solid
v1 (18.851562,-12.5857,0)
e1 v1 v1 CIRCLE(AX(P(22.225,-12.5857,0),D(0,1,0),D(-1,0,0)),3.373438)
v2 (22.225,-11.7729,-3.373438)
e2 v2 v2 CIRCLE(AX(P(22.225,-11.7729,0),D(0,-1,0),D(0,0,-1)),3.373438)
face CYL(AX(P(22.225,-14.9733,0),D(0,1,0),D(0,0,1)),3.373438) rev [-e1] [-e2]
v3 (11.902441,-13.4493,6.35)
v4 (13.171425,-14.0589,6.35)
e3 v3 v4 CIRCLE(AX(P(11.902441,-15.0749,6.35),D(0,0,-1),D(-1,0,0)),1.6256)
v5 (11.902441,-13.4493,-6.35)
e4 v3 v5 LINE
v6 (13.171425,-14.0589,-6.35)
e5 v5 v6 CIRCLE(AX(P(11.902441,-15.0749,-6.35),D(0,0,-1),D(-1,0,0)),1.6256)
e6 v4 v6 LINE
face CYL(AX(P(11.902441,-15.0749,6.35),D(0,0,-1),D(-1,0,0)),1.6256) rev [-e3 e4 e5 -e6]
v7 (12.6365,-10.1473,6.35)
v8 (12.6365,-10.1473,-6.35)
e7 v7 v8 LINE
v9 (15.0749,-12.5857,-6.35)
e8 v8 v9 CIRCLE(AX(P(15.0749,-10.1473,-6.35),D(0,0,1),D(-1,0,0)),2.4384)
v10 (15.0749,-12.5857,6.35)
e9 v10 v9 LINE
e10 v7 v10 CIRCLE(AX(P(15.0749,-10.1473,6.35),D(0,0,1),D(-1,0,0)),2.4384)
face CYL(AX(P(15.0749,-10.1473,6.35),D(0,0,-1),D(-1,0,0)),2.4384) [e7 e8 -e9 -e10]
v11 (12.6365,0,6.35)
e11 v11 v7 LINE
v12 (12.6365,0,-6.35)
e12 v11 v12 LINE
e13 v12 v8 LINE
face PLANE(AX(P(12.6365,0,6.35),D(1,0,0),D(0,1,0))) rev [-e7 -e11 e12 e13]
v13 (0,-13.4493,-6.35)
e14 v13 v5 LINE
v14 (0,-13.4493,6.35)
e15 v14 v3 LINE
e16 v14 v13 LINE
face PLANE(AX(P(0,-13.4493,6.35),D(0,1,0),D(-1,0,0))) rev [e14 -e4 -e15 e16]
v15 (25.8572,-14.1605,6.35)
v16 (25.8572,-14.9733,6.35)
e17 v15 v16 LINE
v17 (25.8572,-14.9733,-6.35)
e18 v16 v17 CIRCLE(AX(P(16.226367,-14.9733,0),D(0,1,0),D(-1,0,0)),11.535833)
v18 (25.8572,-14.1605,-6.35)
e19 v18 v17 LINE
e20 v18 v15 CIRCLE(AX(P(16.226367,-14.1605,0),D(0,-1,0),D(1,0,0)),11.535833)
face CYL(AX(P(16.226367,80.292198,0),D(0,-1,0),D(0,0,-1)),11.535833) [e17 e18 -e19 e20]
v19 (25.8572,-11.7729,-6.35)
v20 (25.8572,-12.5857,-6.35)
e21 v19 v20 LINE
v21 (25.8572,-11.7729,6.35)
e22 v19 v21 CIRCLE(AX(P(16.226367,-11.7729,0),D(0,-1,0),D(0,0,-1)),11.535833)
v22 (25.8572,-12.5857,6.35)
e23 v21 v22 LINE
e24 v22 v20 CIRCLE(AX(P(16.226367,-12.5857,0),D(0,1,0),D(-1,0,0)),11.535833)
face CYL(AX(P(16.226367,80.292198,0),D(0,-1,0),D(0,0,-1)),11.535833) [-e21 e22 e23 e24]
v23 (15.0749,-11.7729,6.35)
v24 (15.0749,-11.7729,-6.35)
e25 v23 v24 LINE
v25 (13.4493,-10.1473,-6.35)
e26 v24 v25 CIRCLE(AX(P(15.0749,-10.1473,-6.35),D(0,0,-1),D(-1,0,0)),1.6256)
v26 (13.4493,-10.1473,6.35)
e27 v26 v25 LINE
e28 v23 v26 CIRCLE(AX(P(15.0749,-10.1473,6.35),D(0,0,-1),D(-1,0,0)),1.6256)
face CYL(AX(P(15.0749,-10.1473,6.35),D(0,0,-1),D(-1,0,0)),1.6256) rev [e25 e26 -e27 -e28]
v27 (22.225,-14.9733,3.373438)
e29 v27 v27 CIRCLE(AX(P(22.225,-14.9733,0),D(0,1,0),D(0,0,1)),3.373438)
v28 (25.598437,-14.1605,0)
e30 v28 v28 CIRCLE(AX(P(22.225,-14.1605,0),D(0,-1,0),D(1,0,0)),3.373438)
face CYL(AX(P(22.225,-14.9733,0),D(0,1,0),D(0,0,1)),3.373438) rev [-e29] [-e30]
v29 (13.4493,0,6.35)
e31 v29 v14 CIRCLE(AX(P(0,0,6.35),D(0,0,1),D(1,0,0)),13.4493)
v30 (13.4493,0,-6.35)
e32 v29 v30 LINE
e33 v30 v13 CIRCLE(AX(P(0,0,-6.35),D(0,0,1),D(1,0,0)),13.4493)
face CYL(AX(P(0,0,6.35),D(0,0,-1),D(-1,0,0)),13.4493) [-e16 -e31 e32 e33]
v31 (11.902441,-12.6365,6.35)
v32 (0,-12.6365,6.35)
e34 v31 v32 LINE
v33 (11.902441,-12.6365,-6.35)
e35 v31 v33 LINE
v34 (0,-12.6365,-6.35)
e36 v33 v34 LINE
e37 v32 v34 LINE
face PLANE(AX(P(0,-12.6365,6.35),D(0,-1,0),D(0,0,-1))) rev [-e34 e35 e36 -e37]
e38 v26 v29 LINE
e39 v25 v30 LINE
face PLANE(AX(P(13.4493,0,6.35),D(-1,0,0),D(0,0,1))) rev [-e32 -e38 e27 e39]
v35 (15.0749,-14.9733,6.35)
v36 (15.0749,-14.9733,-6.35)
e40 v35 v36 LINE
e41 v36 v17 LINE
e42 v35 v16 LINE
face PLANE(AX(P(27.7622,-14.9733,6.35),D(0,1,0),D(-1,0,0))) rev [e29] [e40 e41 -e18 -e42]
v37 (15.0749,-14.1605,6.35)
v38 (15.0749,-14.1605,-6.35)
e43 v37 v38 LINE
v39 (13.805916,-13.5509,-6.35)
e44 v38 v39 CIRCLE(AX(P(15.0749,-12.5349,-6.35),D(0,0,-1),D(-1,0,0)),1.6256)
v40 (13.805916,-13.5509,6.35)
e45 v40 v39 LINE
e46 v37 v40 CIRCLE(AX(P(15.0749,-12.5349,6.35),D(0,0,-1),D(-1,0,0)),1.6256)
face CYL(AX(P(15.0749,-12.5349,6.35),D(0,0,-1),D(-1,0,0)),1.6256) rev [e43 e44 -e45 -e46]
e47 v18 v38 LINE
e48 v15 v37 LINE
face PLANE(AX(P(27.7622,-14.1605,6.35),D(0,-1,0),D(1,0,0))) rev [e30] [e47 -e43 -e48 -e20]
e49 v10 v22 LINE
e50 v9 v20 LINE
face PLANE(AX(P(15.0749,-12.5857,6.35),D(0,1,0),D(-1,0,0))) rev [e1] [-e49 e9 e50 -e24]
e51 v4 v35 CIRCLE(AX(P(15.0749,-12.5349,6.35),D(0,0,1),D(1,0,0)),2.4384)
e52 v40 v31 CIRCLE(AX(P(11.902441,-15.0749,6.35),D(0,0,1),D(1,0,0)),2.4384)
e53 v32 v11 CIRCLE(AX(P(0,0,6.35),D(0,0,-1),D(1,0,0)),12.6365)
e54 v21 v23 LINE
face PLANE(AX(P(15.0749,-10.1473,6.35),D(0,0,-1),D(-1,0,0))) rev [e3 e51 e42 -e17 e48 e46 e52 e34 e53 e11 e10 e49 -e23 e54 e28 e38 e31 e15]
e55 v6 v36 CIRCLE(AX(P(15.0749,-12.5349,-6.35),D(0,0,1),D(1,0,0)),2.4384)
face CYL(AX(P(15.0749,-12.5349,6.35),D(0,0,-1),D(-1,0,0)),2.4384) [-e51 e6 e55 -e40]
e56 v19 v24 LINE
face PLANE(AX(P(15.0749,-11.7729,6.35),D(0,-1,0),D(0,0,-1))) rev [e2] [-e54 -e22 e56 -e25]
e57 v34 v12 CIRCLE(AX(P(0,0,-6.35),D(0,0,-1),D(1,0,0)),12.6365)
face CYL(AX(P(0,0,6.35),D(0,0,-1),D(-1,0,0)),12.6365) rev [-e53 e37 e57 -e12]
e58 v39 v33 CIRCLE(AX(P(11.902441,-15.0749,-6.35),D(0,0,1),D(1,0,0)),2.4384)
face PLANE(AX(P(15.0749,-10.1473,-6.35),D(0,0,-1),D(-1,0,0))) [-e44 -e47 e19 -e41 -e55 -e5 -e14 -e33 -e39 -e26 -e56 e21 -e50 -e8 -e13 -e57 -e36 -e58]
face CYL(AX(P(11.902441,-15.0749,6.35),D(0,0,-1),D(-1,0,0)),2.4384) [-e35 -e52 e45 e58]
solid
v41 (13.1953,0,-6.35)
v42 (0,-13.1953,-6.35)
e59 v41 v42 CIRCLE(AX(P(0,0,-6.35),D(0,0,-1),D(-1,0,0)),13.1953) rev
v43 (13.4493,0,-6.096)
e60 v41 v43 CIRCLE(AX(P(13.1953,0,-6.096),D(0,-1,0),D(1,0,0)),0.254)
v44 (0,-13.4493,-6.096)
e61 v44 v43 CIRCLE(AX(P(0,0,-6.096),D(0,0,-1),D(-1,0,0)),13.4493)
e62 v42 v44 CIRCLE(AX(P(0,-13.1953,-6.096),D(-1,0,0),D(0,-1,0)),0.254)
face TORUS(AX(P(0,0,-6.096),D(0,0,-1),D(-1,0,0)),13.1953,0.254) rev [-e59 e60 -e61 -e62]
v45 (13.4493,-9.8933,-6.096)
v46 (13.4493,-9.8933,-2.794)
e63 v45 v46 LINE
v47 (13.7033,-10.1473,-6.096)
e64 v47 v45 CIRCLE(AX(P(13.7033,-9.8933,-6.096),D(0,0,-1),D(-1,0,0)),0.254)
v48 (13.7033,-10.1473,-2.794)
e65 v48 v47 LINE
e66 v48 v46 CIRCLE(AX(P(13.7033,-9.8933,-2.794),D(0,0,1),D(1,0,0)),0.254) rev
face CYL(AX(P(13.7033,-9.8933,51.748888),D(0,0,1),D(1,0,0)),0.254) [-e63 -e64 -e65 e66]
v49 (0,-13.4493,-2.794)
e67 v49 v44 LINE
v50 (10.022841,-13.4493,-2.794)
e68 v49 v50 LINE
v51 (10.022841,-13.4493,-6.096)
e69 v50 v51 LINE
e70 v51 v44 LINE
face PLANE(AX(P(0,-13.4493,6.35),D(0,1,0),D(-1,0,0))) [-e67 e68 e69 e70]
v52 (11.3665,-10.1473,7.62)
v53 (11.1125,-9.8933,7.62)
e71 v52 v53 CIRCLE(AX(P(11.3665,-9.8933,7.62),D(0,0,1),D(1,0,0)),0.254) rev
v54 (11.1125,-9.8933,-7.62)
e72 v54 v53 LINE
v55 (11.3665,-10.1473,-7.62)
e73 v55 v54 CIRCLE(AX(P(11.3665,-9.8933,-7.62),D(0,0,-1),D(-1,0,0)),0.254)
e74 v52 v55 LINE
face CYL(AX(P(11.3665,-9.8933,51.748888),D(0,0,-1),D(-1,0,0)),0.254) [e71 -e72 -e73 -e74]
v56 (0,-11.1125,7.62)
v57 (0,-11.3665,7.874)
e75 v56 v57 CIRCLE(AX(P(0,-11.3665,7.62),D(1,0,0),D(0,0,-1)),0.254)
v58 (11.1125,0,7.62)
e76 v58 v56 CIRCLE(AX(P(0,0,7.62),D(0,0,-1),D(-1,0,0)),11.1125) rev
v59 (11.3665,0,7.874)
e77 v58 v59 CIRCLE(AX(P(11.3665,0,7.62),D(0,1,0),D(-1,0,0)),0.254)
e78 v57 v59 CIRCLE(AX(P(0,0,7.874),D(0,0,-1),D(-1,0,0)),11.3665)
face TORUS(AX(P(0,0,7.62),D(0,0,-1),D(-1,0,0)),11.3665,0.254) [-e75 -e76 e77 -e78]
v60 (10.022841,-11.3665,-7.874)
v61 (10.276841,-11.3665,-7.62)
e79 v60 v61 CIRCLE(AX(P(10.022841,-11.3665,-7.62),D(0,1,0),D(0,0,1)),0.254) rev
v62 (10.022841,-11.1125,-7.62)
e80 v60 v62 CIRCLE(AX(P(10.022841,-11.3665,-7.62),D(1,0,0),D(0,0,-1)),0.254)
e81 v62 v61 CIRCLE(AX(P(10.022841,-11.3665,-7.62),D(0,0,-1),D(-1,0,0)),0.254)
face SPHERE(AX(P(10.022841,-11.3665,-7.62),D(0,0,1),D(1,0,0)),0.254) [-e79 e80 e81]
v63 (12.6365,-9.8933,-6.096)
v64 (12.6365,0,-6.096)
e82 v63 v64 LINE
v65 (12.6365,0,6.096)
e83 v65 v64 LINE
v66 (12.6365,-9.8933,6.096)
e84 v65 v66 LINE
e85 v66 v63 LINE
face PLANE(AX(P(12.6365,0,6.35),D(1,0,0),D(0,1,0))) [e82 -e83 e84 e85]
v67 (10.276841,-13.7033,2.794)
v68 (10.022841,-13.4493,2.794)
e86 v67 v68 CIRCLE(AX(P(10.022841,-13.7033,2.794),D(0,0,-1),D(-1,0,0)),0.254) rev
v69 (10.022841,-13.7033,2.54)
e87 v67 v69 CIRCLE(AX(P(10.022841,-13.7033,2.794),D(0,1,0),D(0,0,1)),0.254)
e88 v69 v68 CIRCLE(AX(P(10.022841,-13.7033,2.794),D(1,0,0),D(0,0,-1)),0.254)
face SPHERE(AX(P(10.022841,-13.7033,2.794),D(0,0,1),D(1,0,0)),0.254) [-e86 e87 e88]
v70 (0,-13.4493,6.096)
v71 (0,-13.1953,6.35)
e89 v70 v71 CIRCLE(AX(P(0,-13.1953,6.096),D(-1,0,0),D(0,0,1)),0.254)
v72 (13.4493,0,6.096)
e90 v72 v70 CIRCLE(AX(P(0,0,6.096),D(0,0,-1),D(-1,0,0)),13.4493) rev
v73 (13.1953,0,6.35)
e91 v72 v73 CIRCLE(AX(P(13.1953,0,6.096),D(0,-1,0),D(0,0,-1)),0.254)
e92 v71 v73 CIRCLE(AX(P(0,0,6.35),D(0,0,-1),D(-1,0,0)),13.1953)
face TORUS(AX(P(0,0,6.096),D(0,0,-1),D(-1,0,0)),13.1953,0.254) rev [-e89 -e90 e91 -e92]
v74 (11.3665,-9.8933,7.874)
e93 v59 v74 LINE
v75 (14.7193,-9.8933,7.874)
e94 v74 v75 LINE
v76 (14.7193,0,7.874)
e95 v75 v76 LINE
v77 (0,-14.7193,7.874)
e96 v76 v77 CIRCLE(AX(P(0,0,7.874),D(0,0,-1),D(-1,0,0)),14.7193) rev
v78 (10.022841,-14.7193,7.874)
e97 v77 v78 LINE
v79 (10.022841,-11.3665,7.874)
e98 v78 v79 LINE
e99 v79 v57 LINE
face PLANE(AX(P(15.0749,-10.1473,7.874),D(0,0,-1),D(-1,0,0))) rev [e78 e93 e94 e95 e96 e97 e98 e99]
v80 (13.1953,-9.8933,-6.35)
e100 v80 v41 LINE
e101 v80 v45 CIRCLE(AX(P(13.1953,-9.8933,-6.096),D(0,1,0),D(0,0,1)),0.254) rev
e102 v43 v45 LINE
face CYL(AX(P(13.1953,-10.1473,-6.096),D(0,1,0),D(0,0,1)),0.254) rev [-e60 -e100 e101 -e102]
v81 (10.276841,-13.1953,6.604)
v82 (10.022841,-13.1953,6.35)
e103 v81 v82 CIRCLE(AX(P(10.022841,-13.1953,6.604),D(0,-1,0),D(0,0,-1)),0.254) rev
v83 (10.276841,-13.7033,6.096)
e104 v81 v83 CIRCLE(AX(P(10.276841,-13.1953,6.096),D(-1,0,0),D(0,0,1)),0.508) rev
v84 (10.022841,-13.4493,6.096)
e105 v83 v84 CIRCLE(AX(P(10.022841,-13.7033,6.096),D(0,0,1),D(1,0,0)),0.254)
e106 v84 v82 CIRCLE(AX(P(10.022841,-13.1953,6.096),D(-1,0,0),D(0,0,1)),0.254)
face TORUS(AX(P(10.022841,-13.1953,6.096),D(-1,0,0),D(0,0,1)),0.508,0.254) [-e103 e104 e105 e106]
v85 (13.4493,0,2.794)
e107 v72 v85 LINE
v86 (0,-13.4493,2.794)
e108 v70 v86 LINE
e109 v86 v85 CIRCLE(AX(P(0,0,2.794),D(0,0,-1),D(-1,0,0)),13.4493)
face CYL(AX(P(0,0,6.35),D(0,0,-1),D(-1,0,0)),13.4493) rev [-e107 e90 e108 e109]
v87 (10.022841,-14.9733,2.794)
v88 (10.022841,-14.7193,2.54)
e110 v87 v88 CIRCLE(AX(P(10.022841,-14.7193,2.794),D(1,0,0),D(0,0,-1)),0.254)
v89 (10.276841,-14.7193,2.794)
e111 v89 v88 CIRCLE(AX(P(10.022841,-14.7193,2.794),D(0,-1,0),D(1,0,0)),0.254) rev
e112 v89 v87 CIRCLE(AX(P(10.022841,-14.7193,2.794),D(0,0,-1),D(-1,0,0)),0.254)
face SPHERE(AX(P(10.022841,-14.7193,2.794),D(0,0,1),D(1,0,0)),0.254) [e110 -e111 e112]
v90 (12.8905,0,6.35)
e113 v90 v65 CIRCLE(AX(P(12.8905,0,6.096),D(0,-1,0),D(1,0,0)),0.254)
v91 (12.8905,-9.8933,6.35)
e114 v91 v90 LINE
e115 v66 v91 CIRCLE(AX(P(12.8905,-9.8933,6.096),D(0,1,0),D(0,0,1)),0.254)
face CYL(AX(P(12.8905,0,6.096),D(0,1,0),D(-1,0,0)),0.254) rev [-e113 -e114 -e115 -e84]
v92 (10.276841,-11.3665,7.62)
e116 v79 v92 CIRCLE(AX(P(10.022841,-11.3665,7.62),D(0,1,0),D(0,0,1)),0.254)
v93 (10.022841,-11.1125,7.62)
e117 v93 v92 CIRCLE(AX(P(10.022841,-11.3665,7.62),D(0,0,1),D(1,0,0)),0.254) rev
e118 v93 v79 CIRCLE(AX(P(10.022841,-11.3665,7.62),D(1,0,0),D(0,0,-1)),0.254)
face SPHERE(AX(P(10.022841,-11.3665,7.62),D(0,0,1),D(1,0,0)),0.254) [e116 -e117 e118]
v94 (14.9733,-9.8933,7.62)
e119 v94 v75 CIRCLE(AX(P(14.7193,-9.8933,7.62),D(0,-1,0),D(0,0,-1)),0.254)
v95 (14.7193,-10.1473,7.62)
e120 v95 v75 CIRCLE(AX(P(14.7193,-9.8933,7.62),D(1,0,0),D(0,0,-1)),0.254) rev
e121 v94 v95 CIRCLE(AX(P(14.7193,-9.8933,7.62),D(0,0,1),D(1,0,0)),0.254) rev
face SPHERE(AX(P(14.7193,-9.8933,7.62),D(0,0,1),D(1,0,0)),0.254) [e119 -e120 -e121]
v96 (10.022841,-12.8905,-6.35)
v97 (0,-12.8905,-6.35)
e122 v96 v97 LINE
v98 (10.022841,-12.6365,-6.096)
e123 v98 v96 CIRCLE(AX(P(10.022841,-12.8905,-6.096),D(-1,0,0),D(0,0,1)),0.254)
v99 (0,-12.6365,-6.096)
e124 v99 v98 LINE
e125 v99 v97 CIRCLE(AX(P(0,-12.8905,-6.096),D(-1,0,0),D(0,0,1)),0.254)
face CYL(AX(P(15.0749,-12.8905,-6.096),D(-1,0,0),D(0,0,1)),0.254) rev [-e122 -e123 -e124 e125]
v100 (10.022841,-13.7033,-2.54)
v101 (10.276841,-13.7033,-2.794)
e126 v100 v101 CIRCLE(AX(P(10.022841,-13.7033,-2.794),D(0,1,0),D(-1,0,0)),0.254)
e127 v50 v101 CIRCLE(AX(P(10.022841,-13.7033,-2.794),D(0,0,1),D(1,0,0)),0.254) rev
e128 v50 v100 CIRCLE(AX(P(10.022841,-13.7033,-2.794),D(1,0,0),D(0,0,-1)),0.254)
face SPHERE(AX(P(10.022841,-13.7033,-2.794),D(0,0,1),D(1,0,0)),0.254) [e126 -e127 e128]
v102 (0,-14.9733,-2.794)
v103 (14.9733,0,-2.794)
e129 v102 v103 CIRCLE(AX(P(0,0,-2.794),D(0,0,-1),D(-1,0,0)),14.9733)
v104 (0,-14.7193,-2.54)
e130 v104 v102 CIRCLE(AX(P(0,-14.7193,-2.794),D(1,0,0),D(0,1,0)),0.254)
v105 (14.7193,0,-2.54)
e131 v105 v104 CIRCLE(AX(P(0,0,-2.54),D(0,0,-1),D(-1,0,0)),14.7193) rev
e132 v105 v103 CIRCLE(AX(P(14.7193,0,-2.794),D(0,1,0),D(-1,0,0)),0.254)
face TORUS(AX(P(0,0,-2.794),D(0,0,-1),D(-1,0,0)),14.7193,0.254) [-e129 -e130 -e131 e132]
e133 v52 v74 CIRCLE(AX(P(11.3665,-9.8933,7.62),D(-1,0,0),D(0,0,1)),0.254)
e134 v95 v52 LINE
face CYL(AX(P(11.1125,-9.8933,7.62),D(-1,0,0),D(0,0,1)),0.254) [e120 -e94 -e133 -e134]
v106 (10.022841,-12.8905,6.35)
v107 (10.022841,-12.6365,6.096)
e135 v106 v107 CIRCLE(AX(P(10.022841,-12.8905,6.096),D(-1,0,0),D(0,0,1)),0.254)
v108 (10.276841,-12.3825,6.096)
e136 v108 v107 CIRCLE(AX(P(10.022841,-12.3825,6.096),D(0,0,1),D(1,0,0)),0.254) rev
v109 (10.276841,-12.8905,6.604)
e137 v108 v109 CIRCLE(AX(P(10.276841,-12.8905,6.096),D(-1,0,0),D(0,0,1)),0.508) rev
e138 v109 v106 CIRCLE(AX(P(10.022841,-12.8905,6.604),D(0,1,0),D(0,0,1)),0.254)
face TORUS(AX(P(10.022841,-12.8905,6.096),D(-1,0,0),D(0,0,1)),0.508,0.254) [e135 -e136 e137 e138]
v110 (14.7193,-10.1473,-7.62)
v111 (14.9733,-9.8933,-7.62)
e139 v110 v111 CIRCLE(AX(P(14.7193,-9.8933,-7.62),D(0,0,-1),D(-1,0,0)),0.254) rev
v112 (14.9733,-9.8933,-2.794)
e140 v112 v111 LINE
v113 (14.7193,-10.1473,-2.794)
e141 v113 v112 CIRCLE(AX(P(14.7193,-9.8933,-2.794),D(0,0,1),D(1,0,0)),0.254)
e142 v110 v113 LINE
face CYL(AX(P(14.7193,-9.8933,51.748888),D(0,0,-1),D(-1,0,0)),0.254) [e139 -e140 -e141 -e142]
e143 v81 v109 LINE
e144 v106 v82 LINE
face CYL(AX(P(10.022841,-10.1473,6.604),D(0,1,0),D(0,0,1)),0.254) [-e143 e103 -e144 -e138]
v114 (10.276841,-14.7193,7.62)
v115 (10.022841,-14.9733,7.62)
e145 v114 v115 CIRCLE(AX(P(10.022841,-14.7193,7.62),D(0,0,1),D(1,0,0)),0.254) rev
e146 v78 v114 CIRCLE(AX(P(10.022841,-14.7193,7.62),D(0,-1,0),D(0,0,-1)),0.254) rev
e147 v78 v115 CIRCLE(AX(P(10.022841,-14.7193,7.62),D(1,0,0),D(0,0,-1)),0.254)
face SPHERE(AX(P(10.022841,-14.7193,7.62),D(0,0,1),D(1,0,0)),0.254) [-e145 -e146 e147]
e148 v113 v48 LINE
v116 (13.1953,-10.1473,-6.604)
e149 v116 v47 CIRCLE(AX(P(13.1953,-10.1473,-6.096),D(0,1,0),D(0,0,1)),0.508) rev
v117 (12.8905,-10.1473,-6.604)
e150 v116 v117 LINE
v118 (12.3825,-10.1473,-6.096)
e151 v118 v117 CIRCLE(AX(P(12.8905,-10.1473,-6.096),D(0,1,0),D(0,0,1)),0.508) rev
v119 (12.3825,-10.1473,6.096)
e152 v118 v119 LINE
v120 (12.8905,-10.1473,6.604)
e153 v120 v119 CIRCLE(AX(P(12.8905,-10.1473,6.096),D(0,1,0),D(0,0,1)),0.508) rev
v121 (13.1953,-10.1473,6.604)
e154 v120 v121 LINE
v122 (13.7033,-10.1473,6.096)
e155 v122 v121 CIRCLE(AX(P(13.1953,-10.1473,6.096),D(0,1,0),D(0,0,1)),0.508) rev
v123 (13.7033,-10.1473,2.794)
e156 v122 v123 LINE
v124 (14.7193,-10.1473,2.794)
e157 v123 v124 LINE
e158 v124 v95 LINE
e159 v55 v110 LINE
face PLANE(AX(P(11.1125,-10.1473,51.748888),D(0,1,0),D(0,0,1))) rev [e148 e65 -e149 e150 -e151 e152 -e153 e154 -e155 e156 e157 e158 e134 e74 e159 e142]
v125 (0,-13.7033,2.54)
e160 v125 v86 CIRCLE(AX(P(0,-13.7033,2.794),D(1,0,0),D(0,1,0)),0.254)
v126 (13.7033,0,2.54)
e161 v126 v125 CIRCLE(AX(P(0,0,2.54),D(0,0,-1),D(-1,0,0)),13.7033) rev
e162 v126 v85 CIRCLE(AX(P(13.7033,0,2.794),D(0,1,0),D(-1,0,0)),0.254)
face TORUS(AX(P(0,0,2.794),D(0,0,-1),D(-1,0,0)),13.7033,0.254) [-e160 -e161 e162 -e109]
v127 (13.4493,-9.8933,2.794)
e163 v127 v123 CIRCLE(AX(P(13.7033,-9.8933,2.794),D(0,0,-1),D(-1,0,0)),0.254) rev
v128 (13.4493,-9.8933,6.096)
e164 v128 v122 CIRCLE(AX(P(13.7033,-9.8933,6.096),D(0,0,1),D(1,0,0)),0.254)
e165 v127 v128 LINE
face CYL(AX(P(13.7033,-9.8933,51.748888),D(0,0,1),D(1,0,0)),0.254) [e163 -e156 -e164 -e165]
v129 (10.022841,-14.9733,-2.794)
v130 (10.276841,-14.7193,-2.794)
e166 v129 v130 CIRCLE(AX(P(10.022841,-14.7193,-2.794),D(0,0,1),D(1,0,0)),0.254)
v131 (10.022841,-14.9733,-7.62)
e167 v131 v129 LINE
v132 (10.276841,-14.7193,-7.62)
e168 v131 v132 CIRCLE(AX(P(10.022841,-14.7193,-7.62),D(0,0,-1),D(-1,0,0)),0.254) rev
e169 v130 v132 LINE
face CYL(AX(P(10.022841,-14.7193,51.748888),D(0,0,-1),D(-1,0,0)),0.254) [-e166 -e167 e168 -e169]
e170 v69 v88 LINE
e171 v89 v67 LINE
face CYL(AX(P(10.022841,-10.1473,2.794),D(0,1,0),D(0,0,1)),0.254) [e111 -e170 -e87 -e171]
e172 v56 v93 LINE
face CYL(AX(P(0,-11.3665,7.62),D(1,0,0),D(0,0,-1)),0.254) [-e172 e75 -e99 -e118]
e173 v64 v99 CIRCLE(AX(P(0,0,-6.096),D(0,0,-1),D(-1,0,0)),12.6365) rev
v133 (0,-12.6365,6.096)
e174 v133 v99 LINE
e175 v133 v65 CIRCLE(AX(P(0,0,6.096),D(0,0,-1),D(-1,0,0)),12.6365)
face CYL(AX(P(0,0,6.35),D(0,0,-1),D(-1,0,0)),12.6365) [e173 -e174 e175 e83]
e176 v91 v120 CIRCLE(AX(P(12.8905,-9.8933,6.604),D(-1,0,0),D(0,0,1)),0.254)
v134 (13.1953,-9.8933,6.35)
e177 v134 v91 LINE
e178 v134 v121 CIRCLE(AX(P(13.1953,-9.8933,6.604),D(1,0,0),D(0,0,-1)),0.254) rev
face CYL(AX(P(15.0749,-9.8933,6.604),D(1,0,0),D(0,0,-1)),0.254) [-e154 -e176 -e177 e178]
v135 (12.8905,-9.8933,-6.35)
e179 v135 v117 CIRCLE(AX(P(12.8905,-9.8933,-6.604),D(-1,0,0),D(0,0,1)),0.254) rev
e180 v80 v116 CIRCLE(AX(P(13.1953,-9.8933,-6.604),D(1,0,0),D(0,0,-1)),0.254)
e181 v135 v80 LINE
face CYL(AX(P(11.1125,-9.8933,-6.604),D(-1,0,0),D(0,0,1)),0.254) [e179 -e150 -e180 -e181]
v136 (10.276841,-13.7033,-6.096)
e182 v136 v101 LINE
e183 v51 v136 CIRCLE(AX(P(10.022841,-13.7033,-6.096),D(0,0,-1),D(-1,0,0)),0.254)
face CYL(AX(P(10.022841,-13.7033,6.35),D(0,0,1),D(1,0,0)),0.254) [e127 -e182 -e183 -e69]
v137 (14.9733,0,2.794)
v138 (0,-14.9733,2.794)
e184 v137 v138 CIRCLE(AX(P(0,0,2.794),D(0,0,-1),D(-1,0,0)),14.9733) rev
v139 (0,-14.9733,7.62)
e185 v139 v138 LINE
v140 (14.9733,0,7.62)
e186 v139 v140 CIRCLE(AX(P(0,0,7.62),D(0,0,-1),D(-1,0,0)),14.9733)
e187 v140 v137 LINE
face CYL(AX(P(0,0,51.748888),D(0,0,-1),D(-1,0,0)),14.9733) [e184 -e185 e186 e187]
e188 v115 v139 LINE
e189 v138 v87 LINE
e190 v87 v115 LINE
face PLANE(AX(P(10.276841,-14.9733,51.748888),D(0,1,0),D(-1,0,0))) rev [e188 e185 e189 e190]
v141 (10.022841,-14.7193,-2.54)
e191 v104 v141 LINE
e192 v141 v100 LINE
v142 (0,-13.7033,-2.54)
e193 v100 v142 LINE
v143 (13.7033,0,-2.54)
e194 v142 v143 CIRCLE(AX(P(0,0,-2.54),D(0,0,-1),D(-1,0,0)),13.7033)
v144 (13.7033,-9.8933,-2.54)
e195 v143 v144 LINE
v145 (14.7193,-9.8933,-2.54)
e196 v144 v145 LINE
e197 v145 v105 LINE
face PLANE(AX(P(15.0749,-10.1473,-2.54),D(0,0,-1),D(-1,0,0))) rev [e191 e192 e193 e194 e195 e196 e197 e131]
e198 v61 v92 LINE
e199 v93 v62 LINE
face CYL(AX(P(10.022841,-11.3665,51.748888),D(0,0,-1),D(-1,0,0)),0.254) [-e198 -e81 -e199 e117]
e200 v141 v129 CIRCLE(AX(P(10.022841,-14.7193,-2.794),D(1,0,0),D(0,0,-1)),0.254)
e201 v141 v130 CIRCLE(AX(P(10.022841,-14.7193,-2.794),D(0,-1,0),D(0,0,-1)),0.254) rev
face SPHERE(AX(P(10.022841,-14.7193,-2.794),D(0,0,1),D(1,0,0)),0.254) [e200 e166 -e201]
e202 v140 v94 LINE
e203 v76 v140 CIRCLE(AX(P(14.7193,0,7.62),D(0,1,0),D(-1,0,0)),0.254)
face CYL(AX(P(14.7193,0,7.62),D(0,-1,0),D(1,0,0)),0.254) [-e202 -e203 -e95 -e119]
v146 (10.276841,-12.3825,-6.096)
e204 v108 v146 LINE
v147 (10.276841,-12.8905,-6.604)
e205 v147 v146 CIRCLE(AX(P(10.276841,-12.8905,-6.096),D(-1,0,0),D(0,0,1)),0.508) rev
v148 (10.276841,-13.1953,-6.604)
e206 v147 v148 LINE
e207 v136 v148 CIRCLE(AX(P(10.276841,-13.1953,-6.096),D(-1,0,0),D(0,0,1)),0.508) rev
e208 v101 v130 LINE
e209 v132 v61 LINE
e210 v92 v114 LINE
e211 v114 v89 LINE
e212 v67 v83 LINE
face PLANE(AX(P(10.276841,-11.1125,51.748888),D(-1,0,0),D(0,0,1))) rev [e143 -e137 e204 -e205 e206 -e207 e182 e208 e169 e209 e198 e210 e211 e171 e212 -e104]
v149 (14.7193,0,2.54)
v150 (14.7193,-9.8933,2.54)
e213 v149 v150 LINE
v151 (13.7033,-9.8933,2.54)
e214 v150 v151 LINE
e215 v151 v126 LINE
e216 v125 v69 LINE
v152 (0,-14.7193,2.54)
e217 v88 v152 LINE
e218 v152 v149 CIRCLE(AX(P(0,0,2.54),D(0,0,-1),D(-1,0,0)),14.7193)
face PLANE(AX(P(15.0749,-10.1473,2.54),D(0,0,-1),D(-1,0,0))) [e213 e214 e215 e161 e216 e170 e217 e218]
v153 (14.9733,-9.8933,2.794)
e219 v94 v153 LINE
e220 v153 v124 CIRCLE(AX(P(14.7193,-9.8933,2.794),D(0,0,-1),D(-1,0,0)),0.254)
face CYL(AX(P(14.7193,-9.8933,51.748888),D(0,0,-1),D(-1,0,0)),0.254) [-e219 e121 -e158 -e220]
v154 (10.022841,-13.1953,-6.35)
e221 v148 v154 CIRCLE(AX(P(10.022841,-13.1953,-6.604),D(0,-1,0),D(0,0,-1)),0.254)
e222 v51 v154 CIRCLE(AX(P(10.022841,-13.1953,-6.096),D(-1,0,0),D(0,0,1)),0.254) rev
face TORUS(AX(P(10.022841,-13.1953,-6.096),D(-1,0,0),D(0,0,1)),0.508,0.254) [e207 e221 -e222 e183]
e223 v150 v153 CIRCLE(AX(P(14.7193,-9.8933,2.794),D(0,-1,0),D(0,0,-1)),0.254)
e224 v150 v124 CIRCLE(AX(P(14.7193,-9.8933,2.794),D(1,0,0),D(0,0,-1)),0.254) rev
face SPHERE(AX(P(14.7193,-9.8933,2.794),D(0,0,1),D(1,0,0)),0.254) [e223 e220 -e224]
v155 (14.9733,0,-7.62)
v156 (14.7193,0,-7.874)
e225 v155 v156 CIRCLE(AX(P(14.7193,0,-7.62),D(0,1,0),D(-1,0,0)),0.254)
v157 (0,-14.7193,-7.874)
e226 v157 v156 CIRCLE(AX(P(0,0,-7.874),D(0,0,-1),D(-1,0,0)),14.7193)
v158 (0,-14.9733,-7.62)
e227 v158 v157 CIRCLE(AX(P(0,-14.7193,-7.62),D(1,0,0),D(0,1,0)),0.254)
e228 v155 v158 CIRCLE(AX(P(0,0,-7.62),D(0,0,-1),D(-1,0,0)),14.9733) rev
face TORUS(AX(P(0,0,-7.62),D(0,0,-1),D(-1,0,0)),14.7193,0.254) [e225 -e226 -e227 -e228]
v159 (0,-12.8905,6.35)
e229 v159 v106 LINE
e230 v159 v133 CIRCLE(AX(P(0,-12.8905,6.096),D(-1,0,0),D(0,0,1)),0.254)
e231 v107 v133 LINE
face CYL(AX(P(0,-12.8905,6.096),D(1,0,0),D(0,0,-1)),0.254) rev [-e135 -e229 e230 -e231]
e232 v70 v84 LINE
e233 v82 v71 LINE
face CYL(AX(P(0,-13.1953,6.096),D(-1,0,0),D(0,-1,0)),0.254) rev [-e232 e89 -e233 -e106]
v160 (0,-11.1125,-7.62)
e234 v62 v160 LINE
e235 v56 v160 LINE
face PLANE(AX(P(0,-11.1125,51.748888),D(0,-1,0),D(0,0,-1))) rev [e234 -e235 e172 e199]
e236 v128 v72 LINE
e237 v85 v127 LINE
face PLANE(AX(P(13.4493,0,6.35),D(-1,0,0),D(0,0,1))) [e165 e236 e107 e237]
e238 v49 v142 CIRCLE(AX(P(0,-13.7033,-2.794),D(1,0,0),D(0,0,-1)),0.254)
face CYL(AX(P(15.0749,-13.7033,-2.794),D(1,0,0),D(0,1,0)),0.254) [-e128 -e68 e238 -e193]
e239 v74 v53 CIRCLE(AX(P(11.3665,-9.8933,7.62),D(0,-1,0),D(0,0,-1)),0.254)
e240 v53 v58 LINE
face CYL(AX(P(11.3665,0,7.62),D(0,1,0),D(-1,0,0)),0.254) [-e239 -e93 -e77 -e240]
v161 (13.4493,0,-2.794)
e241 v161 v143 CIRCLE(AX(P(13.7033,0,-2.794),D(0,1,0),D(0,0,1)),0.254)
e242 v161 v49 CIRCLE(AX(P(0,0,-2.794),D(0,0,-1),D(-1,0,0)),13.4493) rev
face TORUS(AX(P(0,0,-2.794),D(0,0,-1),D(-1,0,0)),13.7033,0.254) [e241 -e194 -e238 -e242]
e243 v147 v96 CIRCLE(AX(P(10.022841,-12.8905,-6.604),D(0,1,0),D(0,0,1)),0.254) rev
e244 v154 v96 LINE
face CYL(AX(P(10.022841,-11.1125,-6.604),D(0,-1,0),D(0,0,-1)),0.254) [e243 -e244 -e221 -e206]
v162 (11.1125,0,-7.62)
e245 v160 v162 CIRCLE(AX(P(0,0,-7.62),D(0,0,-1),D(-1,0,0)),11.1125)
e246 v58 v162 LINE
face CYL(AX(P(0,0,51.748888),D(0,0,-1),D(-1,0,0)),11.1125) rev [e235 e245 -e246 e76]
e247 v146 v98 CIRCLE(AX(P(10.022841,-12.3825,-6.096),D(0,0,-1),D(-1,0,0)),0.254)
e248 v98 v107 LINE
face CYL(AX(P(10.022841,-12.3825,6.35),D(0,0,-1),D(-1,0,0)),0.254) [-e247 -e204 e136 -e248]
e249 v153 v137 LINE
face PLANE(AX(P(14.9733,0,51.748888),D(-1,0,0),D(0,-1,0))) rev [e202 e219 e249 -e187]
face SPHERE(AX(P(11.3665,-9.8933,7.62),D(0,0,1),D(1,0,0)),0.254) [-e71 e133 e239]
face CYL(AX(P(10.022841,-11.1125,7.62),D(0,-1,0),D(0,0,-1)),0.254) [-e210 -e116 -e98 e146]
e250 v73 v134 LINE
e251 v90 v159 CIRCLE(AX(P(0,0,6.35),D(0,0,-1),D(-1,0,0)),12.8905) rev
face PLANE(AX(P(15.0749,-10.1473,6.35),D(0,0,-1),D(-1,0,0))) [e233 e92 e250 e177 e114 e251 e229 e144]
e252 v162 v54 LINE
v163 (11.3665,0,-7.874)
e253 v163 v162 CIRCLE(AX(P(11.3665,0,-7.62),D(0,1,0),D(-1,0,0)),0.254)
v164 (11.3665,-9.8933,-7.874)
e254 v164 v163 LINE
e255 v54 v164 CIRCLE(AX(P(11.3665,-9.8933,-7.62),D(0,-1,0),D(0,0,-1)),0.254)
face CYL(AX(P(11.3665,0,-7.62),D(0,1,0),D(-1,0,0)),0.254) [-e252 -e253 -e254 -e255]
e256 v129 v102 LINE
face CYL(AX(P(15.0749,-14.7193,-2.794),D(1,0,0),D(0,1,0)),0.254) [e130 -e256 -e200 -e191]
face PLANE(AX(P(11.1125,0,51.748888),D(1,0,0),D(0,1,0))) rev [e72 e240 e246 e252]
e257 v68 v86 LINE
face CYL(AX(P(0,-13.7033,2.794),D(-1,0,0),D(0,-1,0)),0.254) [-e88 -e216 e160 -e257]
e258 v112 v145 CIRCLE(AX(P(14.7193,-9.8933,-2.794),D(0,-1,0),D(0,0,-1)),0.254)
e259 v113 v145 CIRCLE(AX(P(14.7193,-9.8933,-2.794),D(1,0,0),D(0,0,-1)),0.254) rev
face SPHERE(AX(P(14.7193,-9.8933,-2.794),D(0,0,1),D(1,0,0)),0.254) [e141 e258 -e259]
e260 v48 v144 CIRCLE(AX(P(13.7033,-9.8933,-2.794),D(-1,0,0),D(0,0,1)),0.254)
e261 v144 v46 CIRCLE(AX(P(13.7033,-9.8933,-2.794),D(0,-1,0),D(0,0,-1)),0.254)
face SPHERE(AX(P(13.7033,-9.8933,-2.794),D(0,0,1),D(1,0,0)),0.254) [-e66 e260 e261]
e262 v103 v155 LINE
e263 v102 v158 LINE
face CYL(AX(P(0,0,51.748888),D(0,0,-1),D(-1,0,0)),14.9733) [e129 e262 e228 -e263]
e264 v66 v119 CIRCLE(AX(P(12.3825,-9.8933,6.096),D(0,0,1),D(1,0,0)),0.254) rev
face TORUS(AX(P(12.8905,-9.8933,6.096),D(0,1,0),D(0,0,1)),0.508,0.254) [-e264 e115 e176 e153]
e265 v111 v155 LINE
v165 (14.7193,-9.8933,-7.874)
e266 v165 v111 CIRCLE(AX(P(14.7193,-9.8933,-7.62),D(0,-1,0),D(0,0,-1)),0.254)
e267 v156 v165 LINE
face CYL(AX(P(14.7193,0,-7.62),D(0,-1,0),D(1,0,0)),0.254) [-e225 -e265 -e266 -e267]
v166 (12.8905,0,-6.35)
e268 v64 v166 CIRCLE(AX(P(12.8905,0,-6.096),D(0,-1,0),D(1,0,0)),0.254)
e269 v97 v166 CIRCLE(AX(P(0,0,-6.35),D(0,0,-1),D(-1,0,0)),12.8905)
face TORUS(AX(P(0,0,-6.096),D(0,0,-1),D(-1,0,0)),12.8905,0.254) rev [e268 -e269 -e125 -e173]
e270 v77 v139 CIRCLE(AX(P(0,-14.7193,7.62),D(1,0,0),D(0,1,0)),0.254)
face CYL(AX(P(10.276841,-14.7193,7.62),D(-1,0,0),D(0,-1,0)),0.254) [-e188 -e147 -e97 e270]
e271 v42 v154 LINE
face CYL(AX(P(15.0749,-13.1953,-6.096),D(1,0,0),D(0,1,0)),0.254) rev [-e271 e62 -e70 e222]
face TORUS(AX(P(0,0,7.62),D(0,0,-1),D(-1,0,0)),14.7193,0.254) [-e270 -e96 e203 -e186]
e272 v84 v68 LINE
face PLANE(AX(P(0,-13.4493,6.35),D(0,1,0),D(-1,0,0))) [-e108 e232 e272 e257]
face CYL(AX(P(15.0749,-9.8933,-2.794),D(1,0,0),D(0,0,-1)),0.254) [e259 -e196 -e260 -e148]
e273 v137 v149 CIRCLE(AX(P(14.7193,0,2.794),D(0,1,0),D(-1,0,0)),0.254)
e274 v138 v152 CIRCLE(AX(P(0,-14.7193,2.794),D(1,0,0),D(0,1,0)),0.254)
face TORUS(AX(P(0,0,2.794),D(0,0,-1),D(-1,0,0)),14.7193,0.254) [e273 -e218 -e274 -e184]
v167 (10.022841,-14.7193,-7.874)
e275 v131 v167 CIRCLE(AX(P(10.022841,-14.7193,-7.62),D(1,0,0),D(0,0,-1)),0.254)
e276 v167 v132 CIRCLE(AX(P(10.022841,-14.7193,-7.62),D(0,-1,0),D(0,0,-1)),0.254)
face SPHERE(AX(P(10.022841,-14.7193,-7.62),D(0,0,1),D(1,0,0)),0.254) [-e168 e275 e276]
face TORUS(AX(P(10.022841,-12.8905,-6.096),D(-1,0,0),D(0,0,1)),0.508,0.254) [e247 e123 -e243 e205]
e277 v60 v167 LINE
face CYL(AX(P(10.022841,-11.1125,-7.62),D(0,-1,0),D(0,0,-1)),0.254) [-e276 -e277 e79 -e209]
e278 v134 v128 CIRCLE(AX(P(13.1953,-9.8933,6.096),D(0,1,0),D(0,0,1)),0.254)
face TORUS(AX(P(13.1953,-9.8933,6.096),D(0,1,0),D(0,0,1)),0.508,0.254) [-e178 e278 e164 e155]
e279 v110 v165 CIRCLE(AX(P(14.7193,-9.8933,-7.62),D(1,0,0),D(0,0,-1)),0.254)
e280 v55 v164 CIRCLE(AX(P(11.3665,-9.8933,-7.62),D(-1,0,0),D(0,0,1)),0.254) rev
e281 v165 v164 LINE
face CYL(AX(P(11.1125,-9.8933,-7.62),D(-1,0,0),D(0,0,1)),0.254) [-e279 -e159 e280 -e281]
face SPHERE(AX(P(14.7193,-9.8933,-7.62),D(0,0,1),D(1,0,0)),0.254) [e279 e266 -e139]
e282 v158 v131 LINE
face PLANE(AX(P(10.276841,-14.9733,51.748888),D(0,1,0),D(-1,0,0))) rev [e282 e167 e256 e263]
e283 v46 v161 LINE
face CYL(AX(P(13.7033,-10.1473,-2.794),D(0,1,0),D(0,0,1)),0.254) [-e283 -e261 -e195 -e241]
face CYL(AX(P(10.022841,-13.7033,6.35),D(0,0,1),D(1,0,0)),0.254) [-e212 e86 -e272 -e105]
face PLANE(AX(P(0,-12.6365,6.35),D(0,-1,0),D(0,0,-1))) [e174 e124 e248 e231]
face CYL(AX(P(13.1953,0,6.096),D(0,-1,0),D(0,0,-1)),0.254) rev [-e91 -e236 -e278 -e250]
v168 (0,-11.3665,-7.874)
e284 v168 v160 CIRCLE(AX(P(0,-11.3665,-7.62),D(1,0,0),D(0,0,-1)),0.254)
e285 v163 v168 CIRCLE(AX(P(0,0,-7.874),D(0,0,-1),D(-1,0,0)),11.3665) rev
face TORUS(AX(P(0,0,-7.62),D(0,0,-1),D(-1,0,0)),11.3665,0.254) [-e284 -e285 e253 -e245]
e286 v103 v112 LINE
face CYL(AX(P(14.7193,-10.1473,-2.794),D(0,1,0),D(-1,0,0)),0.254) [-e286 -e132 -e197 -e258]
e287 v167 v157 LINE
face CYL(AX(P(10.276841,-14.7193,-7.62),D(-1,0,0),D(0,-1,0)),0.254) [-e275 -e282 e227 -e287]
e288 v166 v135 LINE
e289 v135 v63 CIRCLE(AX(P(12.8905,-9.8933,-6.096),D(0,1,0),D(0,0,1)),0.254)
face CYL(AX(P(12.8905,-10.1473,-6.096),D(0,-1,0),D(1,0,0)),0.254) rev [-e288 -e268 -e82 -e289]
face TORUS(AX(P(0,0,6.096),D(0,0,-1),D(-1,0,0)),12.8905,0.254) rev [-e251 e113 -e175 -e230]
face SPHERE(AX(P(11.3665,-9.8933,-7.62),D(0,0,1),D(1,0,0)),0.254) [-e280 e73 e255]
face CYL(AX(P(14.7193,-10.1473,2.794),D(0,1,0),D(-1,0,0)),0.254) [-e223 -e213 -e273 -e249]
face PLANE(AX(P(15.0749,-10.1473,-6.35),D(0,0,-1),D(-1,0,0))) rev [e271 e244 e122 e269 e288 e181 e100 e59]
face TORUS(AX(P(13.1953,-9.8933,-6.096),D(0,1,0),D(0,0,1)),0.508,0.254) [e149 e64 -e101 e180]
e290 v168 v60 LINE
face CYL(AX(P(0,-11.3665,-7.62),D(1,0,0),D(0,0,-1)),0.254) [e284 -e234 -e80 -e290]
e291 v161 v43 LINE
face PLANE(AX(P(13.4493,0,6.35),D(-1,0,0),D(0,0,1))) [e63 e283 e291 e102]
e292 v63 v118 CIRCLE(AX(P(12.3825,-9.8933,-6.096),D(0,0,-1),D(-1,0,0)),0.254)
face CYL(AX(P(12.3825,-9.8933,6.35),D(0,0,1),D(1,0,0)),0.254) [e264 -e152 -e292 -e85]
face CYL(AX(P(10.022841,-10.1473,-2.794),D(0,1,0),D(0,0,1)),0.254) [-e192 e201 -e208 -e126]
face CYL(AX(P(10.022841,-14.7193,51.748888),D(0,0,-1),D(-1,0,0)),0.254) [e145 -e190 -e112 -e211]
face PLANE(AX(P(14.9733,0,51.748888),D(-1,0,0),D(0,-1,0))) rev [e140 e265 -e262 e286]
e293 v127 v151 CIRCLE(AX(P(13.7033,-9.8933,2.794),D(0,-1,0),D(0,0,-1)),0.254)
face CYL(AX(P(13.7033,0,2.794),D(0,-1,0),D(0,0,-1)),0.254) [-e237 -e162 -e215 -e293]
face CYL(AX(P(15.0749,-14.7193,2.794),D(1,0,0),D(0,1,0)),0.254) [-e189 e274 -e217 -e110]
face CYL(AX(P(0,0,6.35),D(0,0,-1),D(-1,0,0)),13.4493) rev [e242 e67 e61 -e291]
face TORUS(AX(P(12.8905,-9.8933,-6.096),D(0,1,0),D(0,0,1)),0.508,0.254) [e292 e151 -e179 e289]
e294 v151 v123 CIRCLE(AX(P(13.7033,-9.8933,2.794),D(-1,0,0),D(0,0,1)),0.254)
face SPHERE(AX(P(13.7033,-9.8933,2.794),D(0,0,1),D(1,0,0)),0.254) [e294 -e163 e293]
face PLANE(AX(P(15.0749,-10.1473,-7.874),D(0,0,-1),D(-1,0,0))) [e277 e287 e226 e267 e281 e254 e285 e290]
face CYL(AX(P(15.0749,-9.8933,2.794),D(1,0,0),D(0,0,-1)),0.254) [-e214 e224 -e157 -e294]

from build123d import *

# Parameters (mm, degrees)
BOSS_EXTRUDE1_DEPTH         = 6.35
SKETCH2_R                   = 3.3734375
CUT_EXTRUDE1_DEPTH          = 33.17548697
CUT_EXTRUDE3_DEPTH          = 33.17548697
CUT_EXTRUDE3_DEPTH_BACK     = 33.17548697
BOSS_EXTRUDE2_DEPTH         = 7.874
BOSS_EXTRUDE2_DEPTH_BACK    = 7.874
BODY_MOVE_COPY1_START       = -10.1473
BODY_MOVE_COPY1_OUTLINE_W   = 0.8128
BODY_MOVE_COPY1_OUTLINE_H   = 12.7
BODY_MOVE_COPY1_DEPTH       = 10.1473
BODY_MOVE_COPY1_START_2     = -13.5509
BODY_MOVE_COPY1_2_OUTLINE_W = 0.8128
BODY_MOVE_COPY1_2_OUTLINE_H = 12.7
BODY_MOVE_COPY1_2_DEPTH     = 0.1016
BODY_MOVE_COPY1_START_3     = -12.5857
BODY_MOVE_COPY1_3_OUTLINE_R = 3.3734375
BODY_MOVE_COPY1_3_DEPTH     = 2.4384
BODY_MOVE_COPY1_START_4     = -14.9733
BODY_MOVE_COPY1_4_OUTLINE_R = 3.3734375
BODY_MOVE_COPY1_4_DEPTH     = 2.3368
BODY_MOVE_COPY1_5_OUTLINE_W = 0.8128
BODY_MOVE_COPY1_5_OUTLINE_H = 12.7
BODY_MOVE_COPY1_5_DEPTH     = 12.6365
BODY_MOVE_COPY1_START_5     = -6.35
BODY_MOVE_COPY1_6_DEPTH     = 12.7
BODY_MOVE_COPY1_7_DEPTH     = 12.7
CUT_EXTRUDE4_DEPTH          = 2.54
CUT_EXTRUDE4_DEPTH_BACK     = 2.54
FILLET1_R                   = 0.254


with BuildPart() as part:
    # Sketch1 → Boss-Extrude1 (new, symmetric)
    with BuildSketch(Plane.XY):
        with BuildLine():
            Line((0, -12.6365), (11.902441017, -12.6365))
            ThreePointArc((11.902441017, -12.6365), (12.958299189, -12.876955942), (13.805916407, -13.5509))
            ThreePointArc((13.805916407, -13.5509), (14.370994552, -14.000196038), (15.0749, -14.1605))
            Line((15.0749, -14.1605), (27.7622, -14.1605))
            Line((27.7622, -14.1605), (27.7622, -14.9733))
            Line((27.7622, -14.9733), (15.0749, -14.9733))
            ThreePointArc((15.0749, -14.9733), (14.019041828, -14.732844058), (13.17142461, -14.0589))
            ThreePointArc((13.17142461, -14.0589), (12.606346465, -13.609603962), (11.902441017, -13.4493))
            Line((11.902441017, -13.4493), (0, -13.4493))
            ThreePointArc((0, -13.4493), (-9.510091232, 9.510091232), (13.4493, 0))
            Line((13.4493, 0), (13.4493, -10.1473))
            ThreePointArc((13.4493, -10.1473), (13.925427217, -11.296772783), (15.0749, -11.7729))
            Line((15.0749, -11.7729), (27.7622, -11.7729))
            Line((27.7622, -11.7729), (27.7622, -12.5857))
            Line((27.7622, -12.5857), (15.0749, -12.5857))
            ThreePointArc((15.0749, -12.5857), (13.350690825, -11.871509175), (12.6365, -10.1473))
            Line((12.6365, -10.1473), (12.6365, 0))
            ThreePointArc((12.6365, 0), (-8.93535484, 8.93535484), (0, -12.6365))
        make_face()
    extrude(amount=BOSS_EXTRUDE1_DEPTH, both=True)

    # Sketch2 → Cut-Extrude1 (cut, through all)
    with BuildSketch(Plane(origin=(0, 0, 0), x_dir=(1, 0, 0), z_dir=(0, 1, 0))):
        with Locations(Location((22.225, 0, 0), (0, 0, 270))):
            Circle(SKETCH2_R)
    extrude(amount=-CUT_EXTRUDE1_DEPTH, mode=Mode.SUBTRACT)

    # Sketch4 → Cut-Extrude3 (cut, two sides: drawn at the far end of the back side and taken through both)
    with BuildSketch(Plane(origin=(0, 0, 0), x_dir=(1, 0, 0), z_dir=(0, 1, 0)).offset(-CUT_EXTRUDE3_DEPTH_BACK)):
        with BuildLine():
            Line((-25.123285896, 83.67040361), (25.8572, 6.35))
            ThreePointArc((25.8572, 6.35), (27.7622, 0), (25.8572, -6.35))
            Line((25.8572, -6.35), (-25.123285896, -83.67040361))
            Line((-25.123285896, -83.67040361), (160.10581286, -83.67040361))
            Line((160.10581286, -83.67040361), (160.10581286, 83.67040361))
            Line((160.10581286, 83.67040361), (-25.123285896, 83.67040361))
        make_face()
    extrude(amount=CUT_EXTRUDE3_DEPTH + CUT_EXTRUDE3_DEPTH_BACK, mode=Mode.SUBTRACT)


with BuildPart() as body_2:
    # Sketch5 → Boss-Extrude2 (new, two sides: drawn at the far end of the back side and taken through both)
    with BuildSketch(Plane.XY.offset(-BOSS_EXTRUDE2_DEPTH_BACK)):
        with BuildLine():
            Line((11.1125, 0), (11.1125, -10.1473))
            Line((11.1125, -10.1473), (14.9733, -10.1473))
            Line((14.9733, -10.1473), (14.9733, 0))
            ThreePointArc((14.9733, 0), (-10.587721967, 10.587721967), (0, -14.9733))
            Line((0, -14.9733), (10.276841017, -14.9733))
            Line((10.276841017, -14.9733), (10.276841017, -11.1125))
            Line((10.276841017, -11.1125), (0, -11.1125))
            ThreePointArc((0, -11.1125), (-7.857724106, 7.857724106), (11.1125, 0))
        make_face()
    extrude(amount=BOSS_EXTRUDE2_DEPTH + BOSS_EXTRUDE2_DEPTH_BACK)


with BuildPart() as body_3:
    # Body-Move/Copy1: read off the stored shape, not the designer's step
    # Body-Move/Copy1 outline → Body-Move/Copy1 (new body)
    with BuildSketch(Plane(origin=(0, 0, 0), x_dir=(1, 0, 0), z_dir=(0, 1, 0)).offset(BODY_MOVE_COPY1_START)):
        with Locations((13.0429, 0)):
            Rectangle(BODY_MOVE_COPY1_OUTLINE_W, BODY_MOVE_COPY1_OUTLINE_H)
    extrude(amount=BODY_MOVE_COPY1_DEPTH)

    # Body-Move_Copy1 2 outline → Body-Move_Copy1 2 (add)
    with BuildSketch(Plane(origin=(0, 0, 0), x_dir=(1, 0, 0), z_dir=(0, 1, 0)).offset(BODY_MOVE_COPY1_START_2)):
        with Locations((13.0429, 0)):
            Rectangle(BODY_MOVE_COPY1_2_OUTLINE_W, BODY_MOVE_COPY1_2_OUTLINE_H)
    extrude(amount=BODY_MOVE_COPY1_2_DEPTH)

    # Body-Move_Copy1 3 outline → Body-Move_Copy1 3 (add)
    with BuildSketch(Plane(origin=(0, 0, 0), x_dir=(1, 0, 0), z_dir=(0, 1, 0)).offset(BODY_MOVE_COPY1_START_3)):
        with BuildLine():
            ThreePointArc((25.8572, -6.35), (27.7622, 0), (25.8572, 6.35))
            Line((25.8572, 6.35), (12.6365, 6.35))
            Line((12.6365, 6.35), (12.6365, -6.35))
            Line((12.6365, -6.35), (25.8572, -6.35))
        make_face()
        with Locations((22.225, 0)):
            Circle(BODY_MOVE_COPY1_3_OUTLINE_R, mode=Mode.SUBTRACT)
    extrude(amount=BODY_MOVE_COPY1_3_DEPTH)

    # Body-Move_Copy1 4 outline → Body-Move_Copy1 4 (add)
    with BuildSketch(Plane(origin=(0, 0, 0), x_dir=(1, 0, 0), z_dir=(0, 1, 0)).offset(BODY_MOVE_COPY1_START_4)):
        with BuildLine():
            ThreePointArc((25.8572, -6.35), (27.7622, 0), (25.8572, 6.35))
            Line((25.8572, 6.35), (12.6365, 6.35))
            Line((12.6365, 6.35), (12.6365, -6.35))
            Line((12.6365, -6.35), (25.8572, -6.35))
        make_face()
        with Locations((22.225, 0)):
            Circle(BODY_MOVE_COPY1_4_OUTLINE_R, mode=Mode.SUBTRACT)
    extrude(amount=BODY_MOVE_COPY1_4_DEPTH)

    # Body-Move_Copy1 5 outline → Body-Move_Copy1 5 (add)
    with BuildSketch(Plane(origin=(0, 0, 0), x_dir=(1, 0, 0), z_dir=(0, 1, 0))):
        with Locations((13.0429, 0)):
            Rectangle(BODY_MOVE_COPY1_5_OUTLINE_W, BODY_MOVE_COPY1_5_OUTLINE_H)
    extrude(amount=BODY_MOVE_COPY1_5_DEPTH)

    # Body-Move_Copy1 6 outline → Body-Move_Copy1 6 (cut)
    with BuildSketch(Plane.XY.offset(BODY_MOVE_COPY1_START_5)):
        with BuildLine():
            ThreePointArc((13.4493, -10.1473), (13.925427217, -11.296772783), (15.0749, -11.7729))
            Line((15.0749, -11.7729), (29, -11.7729))
            Line((29, -11.7729), (29, -10.1473))
            Line((29, -10.1473), (13.4493, -10.1473))
        make_face()
        with BuildLine():
            ThreePointArc((12.636499997, 4.604621407), (13.244541327, 2.337904091), (13.4493, 0))
            Line((13.4493, 0), (13.4493, 12.6365))
            Line((13.4493, 12.6365), (12.6365, 12.6365))
            Line((12.6365, 12.6365), (12.636499997, 4.604621407))
        make_face()
        with BuildLine():
            Line((12.6365, -12.5857), (15.0749, -12.5857))
            ThreePointArc((15.0749, -12.5857), (13.350690825, -11.871509175), (12.6365, -10.1473))
            Line((12.6365, -10.1473), (12.6365, -12.5857))
        make_face()
        with BuildLine():
            Line((29, -14.1605), (29, -12.6365))
            Line((29, -12.6365), (12.6365, -12.6365))
            Line((12.6365, -12.6365), (12.6365, -12.749614647))
            ThreePointArc((12.6365, -12.749614647), (13.28072308, -13.063399785), (13.805916407, -13.5509))
            ThreePointArc((13.805916407, -13.5509), (14.370994552, -14.000196038), (15.0749, -14.1605))
            Line((15.0749, -14.1605), (29, -14.1605))
        make_face()
        with BuildLine():
            ThreePointArc((13.17142461, -14.0589), (12.927246446, -13.813016807), (12.6365, -13.62447497))
            Line((12.6365, -13.62447497), (12.6365, -14.9733))
            Line((12.6365, -14.9733), (15.0749, -14.9733))
            ThreePointArc((15.0749, -14.9733), (14.019041828, -14.732844058), (13.17142461, -14.0589))
        make_face()
    extrude(amount=BODY_MOVE_COPY1_6_DEPTH, mode=Mode.SUBTRACT)

    # Body-Move_Copy1 7 outline → Body-Move_Copy1 7 (add)
    with BuildSketch(Plane.XY.offset(BODY_MOVE_COPY1_START_5)):
        with BuildLine():
            Line((12.6365, 0), (12.636499997, 4.604621407))
            ThreePointArc((12.636499997, 4.604621407), (-11.018452822, 7.712157149), (0, -13.4493))
            Line((0, -13.4493), (11.902441017, -13.4493))
            ThreePointArc((11.902441017, -13.4493), (12.279776697, -13.493700094), (12.6365, -13.62447497))
            Line((12.6365, -13.62447497), (12.6365, -12.749614647))
            ThreePointArc((12.6365, -12.749614647), (12.273802537, -12.664944568), (11.902441017, -12.6365))
            Line((11.902441017, -12.6365), (0, -12.6365))
            ThreePointArc((0, -12.6365), (-8.93535484, 8.93535484), (12.6365, 0))
        make_face()
    extrude(amount=BODY_MOVE_COPY1_7_DEPTH)


with BuildPart() as body_2_1:
    add(body_2.part)

    # Combine1: cut body 3
    add(body_3.part, mode=Mode.SUBTRACT)

    # Sketch7 → Cut-Extrude4 (cut, two sides: drawn at the far end of the back side and taken through both)
    with BuildSketch(Plane.XY.offset(-CUT_EXTRUDE4_DEPTH_BACK)):
        with BuildLine():
            Line((12.6365, 0), (12.6365, -10.1473))
            Line((12.6365, -10.1473), (14.9733, -10.1473))
            Line((14.9733, -10.1473), (14.9733, 0))
            ThreePointArc((14.9733, 0), (-10.587721967, 10.587721967), (0, -14.9733))
            Line((0, -14.9733), (10.276841017, -14.9733))
            Line((10.276841017, -14.9733), (10.276841017, -12.6365))
            Line((10.276841017, -12.6365), (0, -12.6365))
            ThreePointArc((0, -12.6365), (-8.93535484, 8.93535484), (12.6365, 0))
        make_face()
    extrude(amount=CUT_EXTRUDE4_DEPTH + CUT_EXTRUDE4_DEPTH_BACK, mode=Mode.SUBTRACT)

    # Fillet1
    fillet1_edges = [body_2_1.edges().sort_by_distance(p)[0] for p in [
        (13.4493, -10.1473, -4.445),
        (10.276841017, -13.4493, -4.445),
        (14.9733, -10.1473, -5.207),
        (10.276841017, -14.9733, -5.207),
        (5.138420508, -13.4493, -2.54),
        (-11.018452822, 7.712157149, -2.54),
        (13.4493, -5.07365, -2.54),
        (10.276841017, -14.2113, -2.54),
        (10.276841017, -14.2113, 2.54),
        (5.138420508, -14.9733, 2.54),
        (5.138420508, -14.9733, -2.54),
        (-10.587721967, 10.587721967, 2.54),
        (-10.587721967, 10.587721967, -2.54),
        (14.9733, -5.07365, 2.54),
        (14.9733, -5.07365, -2.54),
        (14.2113, -10.1473, 2.54),
        (14.2113, -10.1473, -2.54),
        (5.138420508, -13.4493, 2.54),
        (-11.018452822, 7.712157149, 2.54),
        (13.4493, -5.07365, 2.54),
        (10.276841017, -11.1125, 0),
        (5.138420508, -11.1125, 7.874),
        (10.276841017, -14.9733, 5.207),
        (14.9733, -10.1473, 5.207),
        (11.1125, -10.1473, 0),
        (10.276841017, -13.0429, 7.874),
        (5.138420508, -14.9733, 7.874),
        (-10.587721967, 10.587721967, 7.874),
        (14.9733, -5.07365, 7.874),
        (13.0429, -10.1473, 7.874),
        (11.1125, -5.07365, 7.874),
        (-7.857724106, 7.857724106, 7.874),
        (11.1125, -5.07365, -7.874),
        (13.0429, -10.1473, -7.874),
        (14.9733, -5.07365, -7.874),
        (-10.587721967, 10.587721967, -7.874),
        (5.138420508, -14.9733, -7.874),
        (10.276841017, -13.0429, -7.874),
        (5.138420508, -11.1125, -7.874),
        (-7.857724106, 7.857724106, -7.874),
        (13.0429, -10.1473, -6.35),
        (13.0429, -10.1473, 6.35),
        (10.276841017, -12.6365, 0),
        (10.276841017, -13.4493, 4.445),
        (5.138420508, -13.4493, -6.35),
        (5.138420508, -12.6365, -6.35),
        (5.138420508, -12.6365, 6.35),
        (-8.93535484, 8.93535484, 6.35),
        (12.6365, -5.07365, 6.35),
        (13.4493, -5.07365, 6.35),
        (-11.018452822, 7.712157149, 6.35),
        (5.138420508, -13.4493, 6.35),
        (10.276841017, -13.0429, 6.35),
        (10.276841017, -13.0429, -6.35),
        (12.6365, -10.1473, 0),
        (13.4493, -5.07365, -6.35),
        (13.4493, -10.1473, 4.445),
        (-11.018452822, 7.712157149, -6.35),
        (-8.93535484, 8.93535484, -6.35),
        (12.6365, -5.07365, -6.35),
    ]]
    fillet(fillet1_edges, radius=FILLET1_R)


solid = Compound([part.part, body_2_1.part])
